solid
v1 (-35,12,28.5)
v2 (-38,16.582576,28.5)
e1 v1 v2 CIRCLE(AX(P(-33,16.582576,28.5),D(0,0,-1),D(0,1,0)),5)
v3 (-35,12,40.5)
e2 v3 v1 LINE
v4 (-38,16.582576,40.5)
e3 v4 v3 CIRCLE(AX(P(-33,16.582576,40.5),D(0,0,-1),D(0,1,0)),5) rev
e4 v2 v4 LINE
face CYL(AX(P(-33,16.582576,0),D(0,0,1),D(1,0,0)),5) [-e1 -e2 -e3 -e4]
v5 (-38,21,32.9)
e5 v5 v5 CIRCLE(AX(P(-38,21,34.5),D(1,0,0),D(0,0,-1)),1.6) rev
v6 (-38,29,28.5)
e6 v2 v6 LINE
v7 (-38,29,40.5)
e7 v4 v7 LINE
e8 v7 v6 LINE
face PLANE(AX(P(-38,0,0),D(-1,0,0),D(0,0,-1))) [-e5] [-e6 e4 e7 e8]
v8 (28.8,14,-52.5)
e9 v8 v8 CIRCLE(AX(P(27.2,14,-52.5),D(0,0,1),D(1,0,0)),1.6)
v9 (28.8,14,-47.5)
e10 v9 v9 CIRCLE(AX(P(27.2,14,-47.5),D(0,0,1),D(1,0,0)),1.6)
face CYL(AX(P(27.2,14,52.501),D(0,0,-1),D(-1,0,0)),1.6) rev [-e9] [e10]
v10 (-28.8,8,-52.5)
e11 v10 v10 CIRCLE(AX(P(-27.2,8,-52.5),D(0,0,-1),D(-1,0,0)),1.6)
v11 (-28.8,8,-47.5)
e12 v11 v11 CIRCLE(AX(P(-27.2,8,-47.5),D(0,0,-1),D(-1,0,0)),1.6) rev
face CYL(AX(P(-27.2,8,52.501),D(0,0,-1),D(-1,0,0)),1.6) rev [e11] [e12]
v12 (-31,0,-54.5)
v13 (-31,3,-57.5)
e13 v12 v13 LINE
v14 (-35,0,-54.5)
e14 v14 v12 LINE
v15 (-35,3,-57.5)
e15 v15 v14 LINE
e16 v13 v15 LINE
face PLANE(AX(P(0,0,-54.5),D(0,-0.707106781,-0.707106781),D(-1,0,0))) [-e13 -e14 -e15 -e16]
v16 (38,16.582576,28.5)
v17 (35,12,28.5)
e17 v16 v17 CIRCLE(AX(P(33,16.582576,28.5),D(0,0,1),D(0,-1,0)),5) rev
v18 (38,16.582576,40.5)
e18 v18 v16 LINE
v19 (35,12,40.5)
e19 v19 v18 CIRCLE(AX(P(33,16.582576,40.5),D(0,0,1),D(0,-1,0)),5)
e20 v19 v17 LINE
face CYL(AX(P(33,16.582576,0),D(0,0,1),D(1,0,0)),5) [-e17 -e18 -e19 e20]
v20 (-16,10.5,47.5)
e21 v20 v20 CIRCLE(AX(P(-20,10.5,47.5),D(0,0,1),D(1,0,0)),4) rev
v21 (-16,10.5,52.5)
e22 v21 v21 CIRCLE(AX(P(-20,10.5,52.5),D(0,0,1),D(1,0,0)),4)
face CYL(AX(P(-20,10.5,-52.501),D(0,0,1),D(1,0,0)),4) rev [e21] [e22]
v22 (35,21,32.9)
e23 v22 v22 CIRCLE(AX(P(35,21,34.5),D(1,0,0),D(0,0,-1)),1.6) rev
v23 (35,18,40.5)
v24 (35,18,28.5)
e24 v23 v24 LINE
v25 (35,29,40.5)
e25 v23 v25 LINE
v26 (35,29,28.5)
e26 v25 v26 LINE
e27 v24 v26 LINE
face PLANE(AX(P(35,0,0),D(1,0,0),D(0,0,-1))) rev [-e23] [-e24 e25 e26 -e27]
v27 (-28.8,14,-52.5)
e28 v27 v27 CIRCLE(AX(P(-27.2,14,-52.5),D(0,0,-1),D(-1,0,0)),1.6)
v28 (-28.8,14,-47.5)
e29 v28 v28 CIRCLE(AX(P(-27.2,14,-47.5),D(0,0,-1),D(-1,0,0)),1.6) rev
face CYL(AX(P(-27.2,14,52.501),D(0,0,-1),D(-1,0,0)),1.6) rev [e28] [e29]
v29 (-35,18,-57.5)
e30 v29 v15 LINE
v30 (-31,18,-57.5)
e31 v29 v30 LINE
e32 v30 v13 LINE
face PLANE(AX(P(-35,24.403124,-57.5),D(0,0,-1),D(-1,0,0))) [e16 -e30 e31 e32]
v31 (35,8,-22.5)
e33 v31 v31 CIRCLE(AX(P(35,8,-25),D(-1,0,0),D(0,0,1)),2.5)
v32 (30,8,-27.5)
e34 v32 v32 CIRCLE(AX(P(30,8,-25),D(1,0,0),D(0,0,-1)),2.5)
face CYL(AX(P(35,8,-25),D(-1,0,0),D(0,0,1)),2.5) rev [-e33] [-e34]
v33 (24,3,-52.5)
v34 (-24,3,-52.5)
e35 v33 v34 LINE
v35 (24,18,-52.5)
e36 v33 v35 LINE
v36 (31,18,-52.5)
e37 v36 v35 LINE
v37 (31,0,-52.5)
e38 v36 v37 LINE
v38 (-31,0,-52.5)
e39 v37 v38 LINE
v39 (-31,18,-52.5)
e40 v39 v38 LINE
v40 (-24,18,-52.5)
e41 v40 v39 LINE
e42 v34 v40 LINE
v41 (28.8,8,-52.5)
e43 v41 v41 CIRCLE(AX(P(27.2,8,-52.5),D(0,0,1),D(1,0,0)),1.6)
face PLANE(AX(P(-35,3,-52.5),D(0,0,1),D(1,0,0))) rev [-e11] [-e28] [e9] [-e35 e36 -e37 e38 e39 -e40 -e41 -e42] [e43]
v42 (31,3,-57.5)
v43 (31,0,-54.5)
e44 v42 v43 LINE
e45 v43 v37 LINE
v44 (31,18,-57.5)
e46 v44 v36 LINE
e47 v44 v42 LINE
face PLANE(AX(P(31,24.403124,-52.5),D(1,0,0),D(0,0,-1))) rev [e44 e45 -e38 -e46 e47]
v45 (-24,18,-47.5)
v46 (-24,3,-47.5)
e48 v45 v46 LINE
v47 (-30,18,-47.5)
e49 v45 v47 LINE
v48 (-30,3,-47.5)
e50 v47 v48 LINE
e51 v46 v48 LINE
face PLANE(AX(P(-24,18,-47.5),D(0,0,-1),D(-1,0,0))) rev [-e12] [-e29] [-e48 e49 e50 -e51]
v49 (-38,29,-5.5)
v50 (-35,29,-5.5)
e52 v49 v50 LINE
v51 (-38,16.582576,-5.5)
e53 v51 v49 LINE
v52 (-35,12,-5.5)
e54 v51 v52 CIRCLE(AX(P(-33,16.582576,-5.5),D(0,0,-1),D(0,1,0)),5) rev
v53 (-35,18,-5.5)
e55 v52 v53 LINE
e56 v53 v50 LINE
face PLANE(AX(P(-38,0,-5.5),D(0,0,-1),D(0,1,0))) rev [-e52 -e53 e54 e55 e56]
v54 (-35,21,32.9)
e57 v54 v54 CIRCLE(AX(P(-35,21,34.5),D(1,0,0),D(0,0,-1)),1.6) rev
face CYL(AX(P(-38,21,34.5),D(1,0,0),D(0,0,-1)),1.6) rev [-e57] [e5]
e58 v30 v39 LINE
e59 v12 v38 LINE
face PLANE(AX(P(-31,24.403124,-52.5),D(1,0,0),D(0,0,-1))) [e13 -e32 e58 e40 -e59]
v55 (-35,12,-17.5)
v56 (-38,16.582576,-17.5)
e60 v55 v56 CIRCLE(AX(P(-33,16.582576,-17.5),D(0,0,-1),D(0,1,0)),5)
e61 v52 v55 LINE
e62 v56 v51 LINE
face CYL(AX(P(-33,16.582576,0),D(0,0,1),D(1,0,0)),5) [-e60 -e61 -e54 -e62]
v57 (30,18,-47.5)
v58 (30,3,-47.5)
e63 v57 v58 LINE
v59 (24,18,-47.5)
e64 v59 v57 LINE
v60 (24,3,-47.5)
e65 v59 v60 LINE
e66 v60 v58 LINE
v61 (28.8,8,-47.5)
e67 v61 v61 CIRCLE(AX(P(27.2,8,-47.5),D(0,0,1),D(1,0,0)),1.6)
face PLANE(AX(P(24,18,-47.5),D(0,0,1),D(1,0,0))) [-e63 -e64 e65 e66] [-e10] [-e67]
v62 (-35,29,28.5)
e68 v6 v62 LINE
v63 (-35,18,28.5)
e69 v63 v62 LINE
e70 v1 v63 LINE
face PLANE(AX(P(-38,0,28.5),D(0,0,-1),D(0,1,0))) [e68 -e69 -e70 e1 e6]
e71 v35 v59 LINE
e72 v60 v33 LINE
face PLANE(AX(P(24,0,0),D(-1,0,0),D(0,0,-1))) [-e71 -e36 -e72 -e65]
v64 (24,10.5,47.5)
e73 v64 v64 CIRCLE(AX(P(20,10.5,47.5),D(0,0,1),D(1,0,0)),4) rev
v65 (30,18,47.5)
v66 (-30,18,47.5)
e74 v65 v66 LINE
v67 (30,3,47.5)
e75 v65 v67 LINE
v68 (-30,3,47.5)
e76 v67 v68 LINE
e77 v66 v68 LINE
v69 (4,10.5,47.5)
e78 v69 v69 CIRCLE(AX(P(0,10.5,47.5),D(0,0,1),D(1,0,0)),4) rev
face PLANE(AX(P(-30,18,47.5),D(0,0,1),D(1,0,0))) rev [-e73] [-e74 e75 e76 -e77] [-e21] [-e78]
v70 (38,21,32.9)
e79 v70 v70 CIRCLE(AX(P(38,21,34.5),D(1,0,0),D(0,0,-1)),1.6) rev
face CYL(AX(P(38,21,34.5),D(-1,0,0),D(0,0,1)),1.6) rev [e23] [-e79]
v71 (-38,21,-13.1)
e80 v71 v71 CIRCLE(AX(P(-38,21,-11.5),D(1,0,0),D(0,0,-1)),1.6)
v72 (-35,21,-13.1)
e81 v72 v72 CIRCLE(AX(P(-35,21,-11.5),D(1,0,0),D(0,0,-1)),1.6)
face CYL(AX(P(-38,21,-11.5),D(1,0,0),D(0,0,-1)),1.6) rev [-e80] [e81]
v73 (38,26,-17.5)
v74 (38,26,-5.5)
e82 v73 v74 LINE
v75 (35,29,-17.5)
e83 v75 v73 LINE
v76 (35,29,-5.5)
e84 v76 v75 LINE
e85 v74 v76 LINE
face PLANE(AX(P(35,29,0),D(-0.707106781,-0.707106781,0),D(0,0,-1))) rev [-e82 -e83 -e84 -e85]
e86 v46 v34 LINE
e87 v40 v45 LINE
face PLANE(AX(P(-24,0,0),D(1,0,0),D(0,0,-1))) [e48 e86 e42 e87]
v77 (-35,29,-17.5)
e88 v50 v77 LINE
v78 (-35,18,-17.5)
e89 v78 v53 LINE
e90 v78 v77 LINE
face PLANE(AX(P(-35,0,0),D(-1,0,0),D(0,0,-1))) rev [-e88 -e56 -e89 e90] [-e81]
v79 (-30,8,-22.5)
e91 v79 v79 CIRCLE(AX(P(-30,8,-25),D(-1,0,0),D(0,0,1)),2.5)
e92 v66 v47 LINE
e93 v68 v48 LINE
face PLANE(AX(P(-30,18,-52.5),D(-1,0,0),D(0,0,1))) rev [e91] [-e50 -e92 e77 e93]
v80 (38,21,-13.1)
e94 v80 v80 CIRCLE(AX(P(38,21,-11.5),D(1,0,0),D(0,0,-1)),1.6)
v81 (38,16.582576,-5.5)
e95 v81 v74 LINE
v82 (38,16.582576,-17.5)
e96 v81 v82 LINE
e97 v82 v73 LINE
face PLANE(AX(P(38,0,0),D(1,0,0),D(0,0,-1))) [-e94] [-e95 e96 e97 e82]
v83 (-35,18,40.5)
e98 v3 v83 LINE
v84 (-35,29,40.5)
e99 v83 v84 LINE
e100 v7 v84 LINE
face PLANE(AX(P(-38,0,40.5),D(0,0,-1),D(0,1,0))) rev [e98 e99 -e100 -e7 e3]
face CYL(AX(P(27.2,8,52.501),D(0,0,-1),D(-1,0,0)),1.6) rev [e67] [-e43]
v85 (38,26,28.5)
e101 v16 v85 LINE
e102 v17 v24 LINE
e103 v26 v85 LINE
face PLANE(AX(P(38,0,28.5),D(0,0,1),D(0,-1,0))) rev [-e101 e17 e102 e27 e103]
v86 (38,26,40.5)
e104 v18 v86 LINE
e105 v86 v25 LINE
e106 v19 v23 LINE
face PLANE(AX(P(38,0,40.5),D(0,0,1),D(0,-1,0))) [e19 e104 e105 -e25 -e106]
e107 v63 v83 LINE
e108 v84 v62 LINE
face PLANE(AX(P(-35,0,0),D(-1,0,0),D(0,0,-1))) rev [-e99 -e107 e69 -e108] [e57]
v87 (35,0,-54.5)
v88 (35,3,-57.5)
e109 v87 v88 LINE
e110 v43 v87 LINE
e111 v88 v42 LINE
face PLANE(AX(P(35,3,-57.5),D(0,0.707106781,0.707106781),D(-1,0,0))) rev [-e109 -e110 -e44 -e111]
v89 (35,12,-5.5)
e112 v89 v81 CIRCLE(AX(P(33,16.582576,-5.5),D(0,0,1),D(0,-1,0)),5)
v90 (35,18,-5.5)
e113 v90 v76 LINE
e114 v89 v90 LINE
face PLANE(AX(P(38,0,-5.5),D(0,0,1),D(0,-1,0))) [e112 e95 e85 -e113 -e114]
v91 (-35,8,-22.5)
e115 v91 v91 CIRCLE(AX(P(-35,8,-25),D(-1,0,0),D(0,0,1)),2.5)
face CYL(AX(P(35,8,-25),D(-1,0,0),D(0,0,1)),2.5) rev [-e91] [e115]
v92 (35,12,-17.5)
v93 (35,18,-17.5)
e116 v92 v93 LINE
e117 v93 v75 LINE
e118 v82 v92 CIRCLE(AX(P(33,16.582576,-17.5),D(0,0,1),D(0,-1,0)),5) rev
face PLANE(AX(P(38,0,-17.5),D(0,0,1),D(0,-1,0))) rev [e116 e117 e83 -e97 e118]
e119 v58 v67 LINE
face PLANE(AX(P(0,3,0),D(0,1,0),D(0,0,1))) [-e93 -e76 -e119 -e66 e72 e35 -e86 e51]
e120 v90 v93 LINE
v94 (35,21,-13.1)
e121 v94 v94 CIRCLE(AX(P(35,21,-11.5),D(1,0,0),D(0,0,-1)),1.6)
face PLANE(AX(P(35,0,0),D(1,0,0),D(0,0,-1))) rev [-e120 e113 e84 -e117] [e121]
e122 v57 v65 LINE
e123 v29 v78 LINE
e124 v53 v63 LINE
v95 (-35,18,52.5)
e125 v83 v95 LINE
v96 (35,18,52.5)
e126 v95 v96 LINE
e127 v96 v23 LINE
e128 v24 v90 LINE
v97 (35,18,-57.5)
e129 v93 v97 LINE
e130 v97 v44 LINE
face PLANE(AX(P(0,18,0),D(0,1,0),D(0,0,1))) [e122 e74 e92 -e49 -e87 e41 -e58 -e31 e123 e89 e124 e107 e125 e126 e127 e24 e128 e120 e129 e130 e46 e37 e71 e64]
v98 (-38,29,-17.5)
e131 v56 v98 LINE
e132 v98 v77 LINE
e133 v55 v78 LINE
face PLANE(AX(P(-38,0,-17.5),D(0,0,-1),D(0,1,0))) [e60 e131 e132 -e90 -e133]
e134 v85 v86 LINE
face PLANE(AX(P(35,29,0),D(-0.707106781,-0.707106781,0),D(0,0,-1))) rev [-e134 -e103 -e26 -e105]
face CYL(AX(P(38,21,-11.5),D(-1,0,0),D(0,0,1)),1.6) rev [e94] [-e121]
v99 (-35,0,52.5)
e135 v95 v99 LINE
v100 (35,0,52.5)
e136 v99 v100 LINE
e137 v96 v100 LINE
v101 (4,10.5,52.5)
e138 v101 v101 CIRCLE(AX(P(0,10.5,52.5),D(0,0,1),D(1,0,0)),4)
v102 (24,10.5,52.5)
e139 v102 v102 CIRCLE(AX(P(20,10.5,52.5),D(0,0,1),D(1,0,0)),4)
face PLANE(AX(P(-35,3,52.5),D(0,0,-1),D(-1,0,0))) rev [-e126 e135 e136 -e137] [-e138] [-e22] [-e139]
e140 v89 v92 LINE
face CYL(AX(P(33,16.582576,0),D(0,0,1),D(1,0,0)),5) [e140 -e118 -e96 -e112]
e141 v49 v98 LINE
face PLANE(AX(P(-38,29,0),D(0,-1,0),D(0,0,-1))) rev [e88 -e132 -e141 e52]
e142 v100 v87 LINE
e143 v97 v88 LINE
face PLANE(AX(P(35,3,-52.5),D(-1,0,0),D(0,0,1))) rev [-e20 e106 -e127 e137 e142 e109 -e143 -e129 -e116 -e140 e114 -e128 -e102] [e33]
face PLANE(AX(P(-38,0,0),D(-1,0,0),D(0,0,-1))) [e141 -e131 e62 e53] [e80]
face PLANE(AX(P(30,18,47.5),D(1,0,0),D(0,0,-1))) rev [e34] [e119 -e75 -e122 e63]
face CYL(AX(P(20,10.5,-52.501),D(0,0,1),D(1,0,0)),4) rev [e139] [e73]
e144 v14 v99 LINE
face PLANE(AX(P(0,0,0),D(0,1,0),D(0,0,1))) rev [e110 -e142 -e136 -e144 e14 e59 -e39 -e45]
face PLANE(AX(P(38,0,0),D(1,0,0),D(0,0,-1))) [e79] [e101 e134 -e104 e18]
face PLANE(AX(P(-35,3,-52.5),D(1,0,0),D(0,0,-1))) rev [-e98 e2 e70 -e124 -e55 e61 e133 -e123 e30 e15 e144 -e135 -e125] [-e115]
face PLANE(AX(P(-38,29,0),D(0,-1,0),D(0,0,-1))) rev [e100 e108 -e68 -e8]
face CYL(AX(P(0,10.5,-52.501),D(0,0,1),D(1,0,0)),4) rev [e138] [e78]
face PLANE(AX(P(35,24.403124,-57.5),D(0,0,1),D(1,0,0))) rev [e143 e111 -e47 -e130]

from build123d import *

# Parameters (mm, degrees)
CROQUIS1_W               = 70
CROQUIS1_H               = 105
SALIENTE_EXTRUIR1_DEPTH  = 3
SALIENTE_EXTRUIR2_DEPTH  = 15
CROQUIS10_R              = 1.6
CROQUIS10_W              = 3
CROQUIS10_H              = 6
CROQUIS10_H_2            = 11
SALIENTE_EXTRUIR4_DEPTH  = 3
REDONDEO1_R              = 5
REDONDEO1_OF_SIMETR_A1_R = 5
CROQUIS12_W              = 5
CROQUIS12_H              = 15
SALIENTE_EXTRUIR5_DEPTH  = 6
CORTAR_EXTRUIR1_REACH    = 117.369
CROQUIS13_R              = 4
CORTAR_EXTRUIR2_REACH    = 117.369
CROQUIS14_R              = 1.6
CROQUIS16_R              = 2.5
CORTAR_EXTRUIR3_DEPTH    = 70
CROQUIS17_W              = 4
CROQUIS17_H              = 5
SALIENTE_EXTRUIR6_DEPTH  = 18
CHAFL_N1_SIZE            = 3
CHAFL_N2_SIZE            = 3


# Some blends are built 0.0001 mm under size
with BuildPart() as part:
    # Croquis1 → Saliente-Extruir1 (new body)
    with BuildSketch(Plane(origin=(0, 0, 0), x_dir=(1, 0, 0), z_dir=(0, 1, 0))):
        Rectangle(CROQUIS1_W, CROQUIS1_H)
    extrude(amount=SALIENTE_EXTRUIR1_DEPTH)

    # Croquis2 → Saliente-Extruir2 (add)
    with BuildSketch(Plane(origin=(0, 3, 0), x_dir=(1, 0, 0), z_dir=(0, 1, 0))):
        Polygon((-35, 52.5), (-30, 52.5), (-30, -47.5), (30, -47.5), (30, 52.5), (35, 52.5), (35, -52.5), (-35, -52.5), align=None)
    extrude(amount=SALIENTE_EXTRUIR2_DEPTH)

    # Croquis10 → Saliente-Extruir4 (add)
    # profile 1 of 6: a face of its own
    with BuildSketch(Plane(origin=(35, 0, 0), x_dir=(0, 0, -1), z_dir=(1, 0, 0))):
        Polygon((8.5, 29), (8.5, 18), (17.5, 18), (17.5, 29), (11.5, 29), align=None)
        with Locations((11.5, 21)):
            Circle(CROQUIS10_R, mode=Mode.SUBTRACT)
    # profile 2 of 6: a face of its own
    with BuildSketch(Plane(origin=(35, 0, 0), x_dir=(0, 0, -1), z_dir=(1, 0, 0))):
        Polygon((8.5, 18), (8.5, 12), (11.5, 12), (17.5, 12), (17.5, 18), align=None)
    # profile 3 of 6: a face of its own
    with BuildSketch(Plane(origin=(35, 0, 0), x_dir=(0, 0, -1), z_dir=(1, 0, 0))):
        with Locations((7, 15)):
            Rectangle(CROQUIS10_W, CROQUIS10_H)
    # profile 4 of 6: a face of its own
    with BuildSketch(Plane(origin=(35, 0, 0), x_dir=(0, 0, -1), z_dir=(1, 0, 0))):
        with Locations((7, 23.5)):
            Rectangle(CROQUIS10_W, CROQUIS10_H_2)
    # profile 5 of 6: a face of its own
    with BuildSketch(Plane(origin=(35, 0, 0), x_dir=(0, 0, -1), z_dir=(1, 0, 0))):
        Polygon((-40.5, 18), (-28.5, 18), (-28.5, 29), (-31.5, 29), (-34.5, 29), (-40.5, 29), align=None)
        with Locations((-34.5, 21)):
            Circle(CROQUIS10_R, mode=Mode.SUBTRACT)
    # profile 6 of 6: a face of its own
    with BuildSketch(Plane(origin=(35, 0, 0), x_dir=(0, 0, -1), z_dir=(1, 0, 0))):
        Polygon((-28.5, 12), (-28.5, 18), (-40.5, 18), (-40.5, 12), (-34.5, 12), (-31.5, 12), align=None)
    saliente_extruir4 = extrude(amount=SALIENTE_EXTRUIR4_DEPTH)

    # Redondeo1
    # the kernel refuses this fillet: 5 mm, written as the material it takes off along each edge
    with BuildSketch(Plane(origin=(38, 12, 5.956439237), x_dir=(-1, 0, 0), z_dir=(0, 0, -1))) as redondeo1_piece_1:
        with BuildLine():
            CenterArc((5, 4.582575695), REDONDEO1_R, 180, 66.421821522)
            Line((0, 4.582575695), (-0.1, 4.582575695))
            Line((-0.1, 4.582575695), (-0.1, 0))
            Line((-0.1, 0), (0, -0.1))
            ThreePointArc((0, -0.1), (1.5, -0.1), (2.96, -0.091651514))
            Line((2.96, -0.091651514), (3, 0))
        make_face()
    extrude(amount=34.912878475, mode=Mode.SUBTRACT)
    with BuildSketch(Plane(origin=(38, 12, 17.043560763), x_dir=(-1, 0, 0), z_dir=(0, 0, 1))) as redondeo1_piece_2:
        with BuildLine():
            CenterArc((5, -4.582575695), REDONDEO1_R, 113.578178478, 66.421821522)
            Line((0, -4.582575695), (-0.1, -4.582575695))
            Line((-0.1, -4.582575695), (-0.1, 0))
            Line((-0.1, 0), (0, 0.1))
            ThreePointArc((0, 0.1), (1.5, 0.1), (2.96, 0.091651514))
            Line((2.96, 0.091651514), (3, 0))
        make_face()
    extrude(amount=34.912878475, mode=Mode.SUBTRACT)

    # Simetría1: Saliente-Extruir4 across plane
    add(saliente_extruir4.mirror(Plane(origin=(0, 0, 0), x_dir=(0, 0, 1), z_dir=(1, 0, 0))))

    # Redondeo1 of Simetría1
    # the kernel refuses this fillet: 5 mm, written as the material it takes off along each edge
    with BuildSketch(Plane(origin=(-38, 12, 5.956439237), x_dir=(1, 0, 0), z_dir=(0, 0, -1))) as redondeo1_of_simetr_a1_piece_1:
        with BuildLine():
            CenterArc((5, -4.582575695), REDONDEO1_OF_SIMETR_A1_R, 113.578178478, 66.421821522)
            Line((0, -4.582575695), (-0.1, -4.582575695))
            Line((-0.1, -4.582575695), (-0.1, 0))
            Line((-0.1, 0), (0, 0.1))
            ThreePointArc((0, 0.1), (1.5, 0.1), (2.96, 0.091651514))
            Line((2.96, 0.091651514), (3, 0))
        make_face()
    extrude(amount=34.912878475, mode=Mode.SUBTRACT)
    with BuildSketch(Plane(origin=(-38, 12, 17.043560763), x_dir=(1, 0, 0), z_dir=(0, 0, 1))) as redondeo1_of_simetr_a1_piece_2:
        with BuildLine():
            CenterArc((5, 4.582575695), REDONDEO1_OF_SIMETR_A1_R, 180, 66.421821522)
            Line((0, 4.582575695), (-0.1, 4.582575695))
            Line((-0.1, 4.582575695), (-0.1, 0))
            Line((-0.1, 0), (0, -0.1))
            ThreePointArc((0, -0.1), (1.5, -0.1), (2.96, -0.091651514))
            Line((2.96, -0.091651514), (3, 0))
        make_face()
    extrude(amount=34.912878475, mode=Mode.SUBTRACT)

    # Croquis12 → Saliente-Extruir5 (add)
    with BuildSketch(Plane(origin=(-30, 0, 0), x_dir=(0, 0, -1), z_dir=(1, 0, 0))):
        with Locations((50, 10.5)):
            Rectangle(CROQUIS12_W, CROQUIS12_H)
    saliente_extruir5 = extrude(amount=SALIENTE_EXTRUIR5_DEPTH)

    # Simetría2: Saliente-Extruir5 across plane
    add(saliente_extruir5.mirror(Plane(origin=(0, 0, 0), x_dir=(0, 0, 1), z_dir=(1, 0, 0))))

    # Croquis13 → Cortar-Extruir1 (cut, up to next)
    with BuildSketch(Plane.XY.offset(52.5), mode=Mode.PRIVATE) as cortar_extruir1_sk1:
        with Locations((-20, 10.5)):
            Circle(CROQUIS13_R)
    cortar_extruir1_tool1 = extrude(cortar_extruir1_sk1.sketch, amount=-CORTAR_EXTRUIR1_REACH, mode=Mode.PRIVATE) & part.part
    # Croquis13 → Cortar-Extruir1 (cut, up to next)
    with BuildSketch(Plane.XY.offset(52.5), mode=Mode.PRIVATE) as cortar_extruir1_sk2:
        with Locations((0, 10.5)):
            Circle(CROQUIS13_R)
    cortar_extruir1_tool2 = extrude(cortar_extruir1_sk2.sketch, amount=-CORTAR_EXTRUIR1_REACH, mode=Mode.PRIVATE) & part.part
    # Croquis13 → Cortar-Extruir1 (cut, up to next)
    with BuildSketch(Plane.XY.offset(52.5), mode=Mode.PRIVATE) as cortar_extruir1_sk3:
        with Locations((20, 10.5)):
            Circle(CROQUIS13_R)
    cortar_extruir1_tool3 = extrude(cortar_extruir1_sk3.sketch, amount=-CORTAR_EXTRUIR1_REACH, mode=Mode.PRIVATE) & part.part
    add(cortar_extruir1_tool1.solids().sort_by_distance((-20, 10.5, 52.5))[0], mode=Mode.SUBTRACT)
    add(cortar_extruir1_tool2.solids().sort_by_distance((0, 10.5, 52.5))[0], mode=Mode.SUBTRACT)
    add(cortar_extruir1_tool3.solids().sort_by_distance((20, 10.5, 52.5))[0], mode=Mode.SUBTRACT)

    # Croquis14 → Cortar-Extruir2 (cut, up to next)
    with BuildSketch(Plane(origin=(0, 0, -52.5), x_dir=(-1, 0, 0), z_dir=(0, 0, -1)), mode=Mode.PRIVATE) as cortar_extruir2_sk1:
        with Locations((27.2, 14)):
            Circle(CROQUIS14_R)
    cortar_extruir2_tool1 = extrude(cortar_extruir2_sk1.sketch, amount=-CORTAR_EXTRUIR2_REACH, mode=Mode.PRIVATE) & part.part
    # Croquis14 → Cortar-Extruir2 (cut, up to next)
    with BuildSketch(Plane(origin=(0, 0, -52.5), x_dir=(-1, 0, 0), z_dir=(0, 0, -1)), mode=Mode.PRIVATE) as cortar_extruir2_sk2:
        with Locations((27.2, 8)):
            Circle(CROQUIS14_R)
    cortar_extruir2_tool2 = extrude(cortar_extruir2_sk2.sketch, amount=-CORTAR_EXTRUIR2_REACH, mode=Mode.PRIVATE) & part.part
    cortar_extruir2_1 = cortar_extruir2_tool1.solids().sort_by_distance((-27.2, 14, -52.5))[0]
    add(cortar_extruir2_1, mode=Mode.SUBTRACT)
    cortar_extruir2_2 = cortar_extruir2_tool2.solids().sort_by_distance((-27.2, 8, -52.5))[0]
    add(cortar_extruir2_2, mode=Mode.SUBTRACT)
    cortar_extruir2 = cortar_extruir2_1 + cortar_extruir2_2  # Cortar-Extruir2 as one shape, for the pattern or mirror that repeats it

    # Simetría3: Cortar-Extruir2 across plane
    add(cortar_extruir2.mirror(Plane(origin=(0, 0, 0), x_dir=(0, 0, 1), z_dir=(1, 0, 0))), mode=Mode.SUBTRACT)

    # Croquis16 → Cortar-Extruir3 (cut)
    with BuildSketch(Plane.ZY.offset(35)):
        with Locations((-25, 8)):
            Circle(CROQUIS16_R)
    extrude(amount=-CORTAR_EXTRUIR3_DEPTH, mode=Mode.SUBTRACT)

    # Croquis17 → Saliente-Extruir6 (add)
    with BuildSketch(Plane(origin=(0, 0, 0), x_dir=(1, 0, 0), z_dir=(0, 1, 0))):
        with Locations((33, 55)):
            Rectangle(CROQUIS17_W, CROQUIS17_H)
    saliente_extruir6 = extrude(amount=SALIENTE_EXTRUIR6_DEPTH)

    # Simetría4: Saliente-Extruir6 across plane
    add(saliente_extruir6.mirror(Plane(origin=(0, 0, 0), x_dir=(0, 0, 1), z_dir=(1, 0, 0))))

    # Chaflán1
    chafl_n1_edges = [part.edges().sort_by_distance(p)[0] for p in [
        (33, 0, -57.5),
        (-33, 0, -57.5),
    ]]
    chamfer(chafl_n1_edges, length=CHAFL_N1_SIZE)

    # Chaflán2
    chafl_n2_edges = [part.edges().sort_by_distance(p)[0] for p in [
        (38, 29, -11.5),
        (38, 29, 34.5),
    ]]
    chamfer(chafl_n2_edges, length=CHAFL_N2_SIZE - 0.0001)  # a hair under: the kernel refuses the full size


solid = part.part
